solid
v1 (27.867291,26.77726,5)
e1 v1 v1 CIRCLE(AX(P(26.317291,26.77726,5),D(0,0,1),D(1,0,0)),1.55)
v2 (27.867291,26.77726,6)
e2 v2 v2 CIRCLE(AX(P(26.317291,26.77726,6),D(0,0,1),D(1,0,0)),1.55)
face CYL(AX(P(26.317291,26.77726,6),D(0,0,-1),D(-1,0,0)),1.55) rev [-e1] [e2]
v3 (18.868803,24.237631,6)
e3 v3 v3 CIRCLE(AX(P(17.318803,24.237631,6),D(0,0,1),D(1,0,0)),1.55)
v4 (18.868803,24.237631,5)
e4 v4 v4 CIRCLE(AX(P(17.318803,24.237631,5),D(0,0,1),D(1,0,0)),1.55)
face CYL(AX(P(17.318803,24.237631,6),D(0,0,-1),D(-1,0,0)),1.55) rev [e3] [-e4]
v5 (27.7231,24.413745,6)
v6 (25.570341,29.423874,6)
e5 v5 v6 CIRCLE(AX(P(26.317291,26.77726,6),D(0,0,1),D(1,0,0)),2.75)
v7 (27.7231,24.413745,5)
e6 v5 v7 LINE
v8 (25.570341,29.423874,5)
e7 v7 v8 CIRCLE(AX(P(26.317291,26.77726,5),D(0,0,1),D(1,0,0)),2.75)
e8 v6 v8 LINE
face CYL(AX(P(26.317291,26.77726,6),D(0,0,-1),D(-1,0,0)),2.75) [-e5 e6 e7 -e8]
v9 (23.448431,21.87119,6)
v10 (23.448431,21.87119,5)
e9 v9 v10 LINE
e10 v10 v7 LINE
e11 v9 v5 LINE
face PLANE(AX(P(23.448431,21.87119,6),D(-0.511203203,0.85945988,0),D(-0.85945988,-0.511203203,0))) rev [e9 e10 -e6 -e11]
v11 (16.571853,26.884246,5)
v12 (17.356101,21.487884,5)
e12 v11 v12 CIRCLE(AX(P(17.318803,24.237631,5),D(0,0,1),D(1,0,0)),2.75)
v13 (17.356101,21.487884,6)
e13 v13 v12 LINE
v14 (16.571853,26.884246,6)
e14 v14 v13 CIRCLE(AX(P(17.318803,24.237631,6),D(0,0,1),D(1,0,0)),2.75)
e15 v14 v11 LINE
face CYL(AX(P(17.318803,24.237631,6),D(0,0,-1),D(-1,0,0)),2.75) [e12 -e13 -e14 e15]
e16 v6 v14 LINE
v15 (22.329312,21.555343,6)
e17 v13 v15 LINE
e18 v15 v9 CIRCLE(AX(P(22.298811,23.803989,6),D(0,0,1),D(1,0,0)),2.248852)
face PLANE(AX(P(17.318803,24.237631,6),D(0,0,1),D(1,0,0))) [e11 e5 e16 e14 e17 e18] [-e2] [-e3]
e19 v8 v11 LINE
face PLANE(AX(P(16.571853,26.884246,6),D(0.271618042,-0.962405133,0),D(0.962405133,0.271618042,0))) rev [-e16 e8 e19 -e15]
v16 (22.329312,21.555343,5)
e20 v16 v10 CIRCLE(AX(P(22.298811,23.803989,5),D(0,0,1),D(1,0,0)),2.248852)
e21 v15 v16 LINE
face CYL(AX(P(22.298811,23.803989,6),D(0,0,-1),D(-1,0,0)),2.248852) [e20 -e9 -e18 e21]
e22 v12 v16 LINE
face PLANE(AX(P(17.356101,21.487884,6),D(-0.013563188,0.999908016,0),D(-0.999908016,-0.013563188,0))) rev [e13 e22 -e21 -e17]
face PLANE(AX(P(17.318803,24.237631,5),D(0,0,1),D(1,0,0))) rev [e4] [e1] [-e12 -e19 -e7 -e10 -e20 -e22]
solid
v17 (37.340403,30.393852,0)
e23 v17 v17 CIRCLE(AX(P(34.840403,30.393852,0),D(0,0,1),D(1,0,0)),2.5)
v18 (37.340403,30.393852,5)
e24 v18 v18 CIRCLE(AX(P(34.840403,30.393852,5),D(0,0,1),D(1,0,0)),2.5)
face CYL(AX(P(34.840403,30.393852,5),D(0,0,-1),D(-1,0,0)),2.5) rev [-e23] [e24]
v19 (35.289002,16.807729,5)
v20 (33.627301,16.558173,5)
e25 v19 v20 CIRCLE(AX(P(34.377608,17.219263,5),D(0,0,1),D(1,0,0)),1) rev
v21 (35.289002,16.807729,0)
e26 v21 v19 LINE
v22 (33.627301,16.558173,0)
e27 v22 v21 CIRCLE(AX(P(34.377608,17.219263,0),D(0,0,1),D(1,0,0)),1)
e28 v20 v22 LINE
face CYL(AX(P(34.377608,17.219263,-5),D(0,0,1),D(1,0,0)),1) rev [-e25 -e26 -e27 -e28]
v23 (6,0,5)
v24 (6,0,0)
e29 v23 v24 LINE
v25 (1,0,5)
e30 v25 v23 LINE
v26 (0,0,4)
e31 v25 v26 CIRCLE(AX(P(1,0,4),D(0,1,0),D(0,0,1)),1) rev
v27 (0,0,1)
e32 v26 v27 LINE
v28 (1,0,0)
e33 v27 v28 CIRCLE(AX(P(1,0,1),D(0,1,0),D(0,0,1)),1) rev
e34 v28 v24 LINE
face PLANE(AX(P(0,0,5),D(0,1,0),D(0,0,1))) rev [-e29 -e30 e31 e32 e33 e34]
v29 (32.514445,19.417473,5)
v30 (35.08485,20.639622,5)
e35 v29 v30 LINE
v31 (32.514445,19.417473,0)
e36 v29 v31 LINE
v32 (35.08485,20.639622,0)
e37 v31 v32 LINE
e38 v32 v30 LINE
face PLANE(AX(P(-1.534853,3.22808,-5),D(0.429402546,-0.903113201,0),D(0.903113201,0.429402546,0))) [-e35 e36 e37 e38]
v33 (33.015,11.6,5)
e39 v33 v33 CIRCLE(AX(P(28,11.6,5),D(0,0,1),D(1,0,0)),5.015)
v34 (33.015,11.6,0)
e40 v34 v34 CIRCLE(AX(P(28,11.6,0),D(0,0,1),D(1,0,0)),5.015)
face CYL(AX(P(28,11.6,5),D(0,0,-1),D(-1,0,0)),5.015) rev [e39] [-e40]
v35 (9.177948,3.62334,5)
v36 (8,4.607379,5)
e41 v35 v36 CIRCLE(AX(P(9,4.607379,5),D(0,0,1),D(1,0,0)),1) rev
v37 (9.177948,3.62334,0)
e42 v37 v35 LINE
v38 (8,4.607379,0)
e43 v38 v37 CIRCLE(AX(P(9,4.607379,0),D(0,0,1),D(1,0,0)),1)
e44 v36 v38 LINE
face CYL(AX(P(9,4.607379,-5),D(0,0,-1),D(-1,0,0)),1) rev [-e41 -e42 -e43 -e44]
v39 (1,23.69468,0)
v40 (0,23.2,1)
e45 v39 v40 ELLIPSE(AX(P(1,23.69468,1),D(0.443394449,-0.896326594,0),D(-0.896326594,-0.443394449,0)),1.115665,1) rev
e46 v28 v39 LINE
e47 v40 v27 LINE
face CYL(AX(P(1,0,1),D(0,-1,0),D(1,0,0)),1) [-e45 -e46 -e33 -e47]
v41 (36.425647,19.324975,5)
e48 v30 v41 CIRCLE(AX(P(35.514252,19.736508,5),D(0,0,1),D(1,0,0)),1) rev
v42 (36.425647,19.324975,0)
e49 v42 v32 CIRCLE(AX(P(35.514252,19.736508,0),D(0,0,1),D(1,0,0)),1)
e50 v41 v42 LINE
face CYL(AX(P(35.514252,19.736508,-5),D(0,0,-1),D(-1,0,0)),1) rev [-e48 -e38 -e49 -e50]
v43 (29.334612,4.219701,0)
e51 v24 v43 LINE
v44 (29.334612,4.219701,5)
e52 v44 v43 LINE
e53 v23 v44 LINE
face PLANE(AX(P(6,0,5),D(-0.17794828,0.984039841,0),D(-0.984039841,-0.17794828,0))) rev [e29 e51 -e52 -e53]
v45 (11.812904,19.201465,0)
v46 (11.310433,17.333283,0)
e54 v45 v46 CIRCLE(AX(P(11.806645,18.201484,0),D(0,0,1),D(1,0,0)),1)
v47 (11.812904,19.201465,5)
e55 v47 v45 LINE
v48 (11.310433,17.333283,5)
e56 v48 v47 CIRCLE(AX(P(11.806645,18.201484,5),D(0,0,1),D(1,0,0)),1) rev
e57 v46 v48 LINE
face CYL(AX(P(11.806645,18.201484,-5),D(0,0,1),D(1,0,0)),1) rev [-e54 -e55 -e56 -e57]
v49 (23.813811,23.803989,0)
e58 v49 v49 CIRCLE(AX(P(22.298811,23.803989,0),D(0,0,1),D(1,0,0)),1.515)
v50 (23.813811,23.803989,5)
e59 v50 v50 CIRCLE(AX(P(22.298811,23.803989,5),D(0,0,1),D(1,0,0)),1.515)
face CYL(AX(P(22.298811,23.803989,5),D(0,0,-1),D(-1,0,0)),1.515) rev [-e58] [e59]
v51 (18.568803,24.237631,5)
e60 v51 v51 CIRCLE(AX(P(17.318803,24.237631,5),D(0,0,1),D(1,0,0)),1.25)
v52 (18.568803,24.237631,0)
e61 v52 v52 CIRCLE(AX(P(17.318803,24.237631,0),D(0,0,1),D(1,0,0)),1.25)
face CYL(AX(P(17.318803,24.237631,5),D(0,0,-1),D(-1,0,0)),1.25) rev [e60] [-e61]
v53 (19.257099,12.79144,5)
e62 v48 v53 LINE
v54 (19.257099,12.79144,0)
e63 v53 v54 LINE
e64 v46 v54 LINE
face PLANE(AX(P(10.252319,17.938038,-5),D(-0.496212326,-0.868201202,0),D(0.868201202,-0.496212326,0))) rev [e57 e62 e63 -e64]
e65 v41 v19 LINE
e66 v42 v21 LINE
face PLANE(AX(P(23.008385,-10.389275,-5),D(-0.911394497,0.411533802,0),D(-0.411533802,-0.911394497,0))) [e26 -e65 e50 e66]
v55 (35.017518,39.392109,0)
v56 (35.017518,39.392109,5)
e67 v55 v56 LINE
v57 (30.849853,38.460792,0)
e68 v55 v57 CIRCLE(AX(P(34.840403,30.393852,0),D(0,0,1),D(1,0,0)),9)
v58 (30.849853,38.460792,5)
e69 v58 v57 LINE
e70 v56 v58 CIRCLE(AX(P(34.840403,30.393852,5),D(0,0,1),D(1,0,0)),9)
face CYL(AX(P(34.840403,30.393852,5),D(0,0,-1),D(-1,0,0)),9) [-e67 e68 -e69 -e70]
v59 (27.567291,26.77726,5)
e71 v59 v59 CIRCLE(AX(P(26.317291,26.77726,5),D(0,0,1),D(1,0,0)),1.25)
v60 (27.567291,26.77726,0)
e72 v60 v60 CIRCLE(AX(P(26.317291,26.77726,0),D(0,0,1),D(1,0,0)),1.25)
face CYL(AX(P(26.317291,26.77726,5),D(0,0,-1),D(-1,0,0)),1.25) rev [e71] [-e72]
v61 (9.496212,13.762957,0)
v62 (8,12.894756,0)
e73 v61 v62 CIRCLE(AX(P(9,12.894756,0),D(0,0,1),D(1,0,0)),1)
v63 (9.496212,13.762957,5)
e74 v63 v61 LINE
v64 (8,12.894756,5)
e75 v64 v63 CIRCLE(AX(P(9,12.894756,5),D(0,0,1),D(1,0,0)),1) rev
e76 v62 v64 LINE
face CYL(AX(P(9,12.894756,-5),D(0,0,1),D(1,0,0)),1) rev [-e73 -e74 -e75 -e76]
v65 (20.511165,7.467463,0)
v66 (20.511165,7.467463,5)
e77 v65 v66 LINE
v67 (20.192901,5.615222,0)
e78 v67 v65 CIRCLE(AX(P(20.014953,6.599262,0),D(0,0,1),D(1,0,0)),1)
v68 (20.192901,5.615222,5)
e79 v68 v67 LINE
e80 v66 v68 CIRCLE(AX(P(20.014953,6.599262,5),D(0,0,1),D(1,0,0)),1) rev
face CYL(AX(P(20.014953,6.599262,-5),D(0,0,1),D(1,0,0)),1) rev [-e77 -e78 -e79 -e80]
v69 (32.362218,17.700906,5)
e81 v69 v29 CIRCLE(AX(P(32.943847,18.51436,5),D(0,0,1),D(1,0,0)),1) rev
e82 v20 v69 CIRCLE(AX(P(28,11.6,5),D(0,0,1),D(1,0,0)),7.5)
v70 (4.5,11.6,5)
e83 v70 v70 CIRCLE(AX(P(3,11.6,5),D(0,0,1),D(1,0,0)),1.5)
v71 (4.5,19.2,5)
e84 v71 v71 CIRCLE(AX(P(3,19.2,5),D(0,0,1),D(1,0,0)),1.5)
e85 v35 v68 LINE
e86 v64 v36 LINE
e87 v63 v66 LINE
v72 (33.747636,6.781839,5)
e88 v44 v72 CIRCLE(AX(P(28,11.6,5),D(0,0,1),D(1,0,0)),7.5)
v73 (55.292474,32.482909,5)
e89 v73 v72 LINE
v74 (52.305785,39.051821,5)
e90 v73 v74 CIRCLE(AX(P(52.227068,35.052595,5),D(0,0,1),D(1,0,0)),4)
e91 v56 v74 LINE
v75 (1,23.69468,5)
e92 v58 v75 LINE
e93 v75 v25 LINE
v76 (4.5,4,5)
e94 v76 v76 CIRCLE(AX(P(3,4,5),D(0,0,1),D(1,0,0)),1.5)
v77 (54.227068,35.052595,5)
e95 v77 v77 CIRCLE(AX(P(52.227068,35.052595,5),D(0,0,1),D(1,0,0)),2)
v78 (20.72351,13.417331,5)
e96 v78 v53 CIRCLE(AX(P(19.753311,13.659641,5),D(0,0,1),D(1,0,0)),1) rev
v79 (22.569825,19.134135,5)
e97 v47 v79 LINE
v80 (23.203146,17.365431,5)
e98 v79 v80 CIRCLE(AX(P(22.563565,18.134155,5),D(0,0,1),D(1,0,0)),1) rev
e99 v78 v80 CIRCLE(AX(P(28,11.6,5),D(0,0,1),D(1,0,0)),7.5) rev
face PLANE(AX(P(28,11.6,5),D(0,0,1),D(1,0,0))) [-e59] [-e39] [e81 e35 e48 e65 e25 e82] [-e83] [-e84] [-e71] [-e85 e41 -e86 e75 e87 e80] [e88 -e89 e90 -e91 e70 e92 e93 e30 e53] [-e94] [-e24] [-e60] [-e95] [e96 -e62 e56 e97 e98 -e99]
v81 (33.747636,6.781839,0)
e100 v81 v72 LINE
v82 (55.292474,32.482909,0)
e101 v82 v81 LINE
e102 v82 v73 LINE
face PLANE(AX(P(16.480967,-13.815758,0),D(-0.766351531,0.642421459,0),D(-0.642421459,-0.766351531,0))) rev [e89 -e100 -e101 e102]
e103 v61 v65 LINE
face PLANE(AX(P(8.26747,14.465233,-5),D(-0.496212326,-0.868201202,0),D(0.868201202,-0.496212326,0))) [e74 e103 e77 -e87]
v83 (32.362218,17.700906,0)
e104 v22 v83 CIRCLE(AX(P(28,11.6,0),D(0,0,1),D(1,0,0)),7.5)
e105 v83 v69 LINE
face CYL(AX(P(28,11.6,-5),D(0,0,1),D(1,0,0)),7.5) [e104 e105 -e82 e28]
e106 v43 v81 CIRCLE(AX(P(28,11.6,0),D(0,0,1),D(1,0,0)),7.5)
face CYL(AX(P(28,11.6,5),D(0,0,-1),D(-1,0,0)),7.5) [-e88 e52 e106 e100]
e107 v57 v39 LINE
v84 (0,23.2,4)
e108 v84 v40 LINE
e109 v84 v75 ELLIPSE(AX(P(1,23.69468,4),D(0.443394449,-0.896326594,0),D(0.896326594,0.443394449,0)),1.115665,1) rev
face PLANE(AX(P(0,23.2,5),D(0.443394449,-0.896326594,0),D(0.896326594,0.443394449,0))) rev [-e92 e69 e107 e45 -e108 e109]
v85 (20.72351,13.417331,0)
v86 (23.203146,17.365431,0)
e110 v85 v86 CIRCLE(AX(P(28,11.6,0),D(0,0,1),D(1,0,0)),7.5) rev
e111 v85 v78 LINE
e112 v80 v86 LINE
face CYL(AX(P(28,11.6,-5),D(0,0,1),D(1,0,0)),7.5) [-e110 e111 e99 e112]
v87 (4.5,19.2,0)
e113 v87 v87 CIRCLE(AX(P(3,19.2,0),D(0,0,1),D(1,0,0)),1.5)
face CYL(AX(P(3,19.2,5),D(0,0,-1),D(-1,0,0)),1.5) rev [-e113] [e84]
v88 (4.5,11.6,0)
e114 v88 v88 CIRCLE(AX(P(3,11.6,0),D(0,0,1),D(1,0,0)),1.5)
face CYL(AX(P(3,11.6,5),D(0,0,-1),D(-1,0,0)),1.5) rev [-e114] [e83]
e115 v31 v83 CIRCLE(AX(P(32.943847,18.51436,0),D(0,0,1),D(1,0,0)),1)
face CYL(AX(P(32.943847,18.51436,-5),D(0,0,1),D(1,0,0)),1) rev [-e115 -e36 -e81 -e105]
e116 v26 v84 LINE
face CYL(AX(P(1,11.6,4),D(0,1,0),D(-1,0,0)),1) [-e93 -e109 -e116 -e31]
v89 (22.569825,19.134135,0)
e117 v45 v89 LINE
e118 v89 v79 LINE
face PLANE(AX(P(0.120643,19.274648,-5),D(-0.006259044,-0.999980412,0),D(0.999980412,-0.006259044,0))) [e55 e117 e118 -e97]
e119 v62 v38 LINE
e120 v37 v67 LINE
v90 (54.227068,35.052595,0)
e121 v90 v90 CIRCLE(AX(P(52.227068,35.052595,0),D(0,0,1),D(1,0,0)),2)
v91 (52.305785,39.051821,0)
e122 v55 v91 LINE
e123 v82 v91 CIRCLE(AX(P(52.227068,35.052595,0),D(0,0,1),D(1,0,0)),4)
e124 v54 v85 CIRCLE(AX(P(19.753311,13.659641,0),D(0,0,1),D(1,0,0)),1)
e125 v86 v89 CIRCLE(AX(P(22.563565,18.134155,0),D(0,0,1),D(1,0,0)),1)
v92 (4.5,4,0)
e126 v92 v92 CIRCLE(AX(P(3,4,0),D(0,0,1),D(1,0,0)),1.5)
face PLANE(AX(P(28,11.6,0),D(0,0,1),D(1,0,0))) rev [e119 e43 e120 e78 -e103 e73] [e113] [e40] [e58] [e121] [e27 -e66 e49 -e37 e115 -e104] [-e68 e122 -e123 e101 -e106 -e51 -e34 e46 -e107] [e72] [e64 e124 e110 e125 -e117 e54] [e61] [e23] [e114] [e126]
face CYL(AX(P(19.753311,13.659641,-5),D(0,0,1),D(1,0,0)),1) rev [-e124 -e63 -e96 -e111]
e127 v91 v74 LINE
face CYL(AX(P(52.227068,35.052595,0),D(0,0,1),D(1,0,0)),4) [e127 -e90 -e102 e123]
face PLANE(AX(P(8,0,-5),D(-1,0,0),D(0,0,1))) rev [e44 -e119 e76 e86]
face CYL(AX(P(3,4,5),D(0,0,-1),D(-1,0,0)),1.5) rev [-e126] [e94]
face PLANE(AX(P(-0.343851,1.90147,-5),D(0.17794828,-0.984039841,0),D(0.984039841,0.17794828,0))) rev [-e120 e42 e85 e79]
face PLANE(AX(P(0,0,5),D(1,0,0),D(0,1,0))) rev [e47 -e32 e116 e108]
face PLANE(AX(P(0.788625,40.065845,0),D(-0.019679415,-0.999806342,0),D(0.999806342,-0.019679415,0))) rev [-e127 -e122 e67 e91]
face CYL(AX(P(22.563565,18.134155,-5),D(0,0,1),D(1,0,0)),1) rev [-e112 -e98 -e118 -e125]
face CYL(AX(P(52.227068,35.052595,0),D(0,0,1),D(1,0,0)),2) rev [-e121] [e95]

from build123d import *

# Parameters (mm, degrees)
SKETCH_1_R          = 1.5
SKETCH_1_R_2        = 5.015
SKETCH_1_R_3        = 2.5
SKETCH_1_R_4        = 1.515
SKETCH_1_R_5        = 1.25
EXTRUDE_1_DEPTH     = 5
FILLET_1_R          = 1
SKETCH_2_R          = 1.55
EXTRUDE_2_DEPTH     = 1
CUT_EXTRUDE_START   = -10
CUT_EXTRUDE_1_DEPTH = 10
FILLET_2_R          = 1
EXTRUDE_START       = -5
SKETCH_4_R          = 2
EXTRUDE_3_DEPTH     = 5


with BuildPart() as part:
    # 草图1 → 凸台-拉伸1 (new body)
    with BuildSketch(Plane.XY):
        with BuildLine():
            Line((0, 0), (0, 23.2))
            Line((0, 23.2), (30.849852826, 38.460791759))
            ThreePointArc((30.849852826, 38.460791759), (41.091229844, 36.86897111), (43.042953344, 26.6900482))
            Line((43.042953344, 26.6900482), (34.835458731, 8.513496487))
            ThreePointArc((34.835458731, 8.513496487), (32.614833027, 5.68786704), (29.3346121, 4.219701189))
            Line((29.3346121, 4.219701189), (6, 0))
            Line((6, 0), (0, 0))
        make_face()
        with Locations((3, 19.2)):
            Circle(SKETCH_1_R, mode=Mode.SUBTRACT)
        with Locations((3, 11.6)):
            Circle(SKETCH_1_R, mode=Mode.SUBTRACT)
        with Locations((3, 4)):
            Circle(SKETCH_1_R, mode=Mode.SUBTRACT)
        with Locations((28, 11.6)):
            Circle(SKETCH_1_R_2, mode=Mode.SUBTRACT)
        with Locations((34.840402867, 30.393852416)):
            Circle(SKETCH_1_R_3, mode=Mode.SUBTRACT)
        with Locations((22.298810634, 23.803988685)):
            Circle(SKETCH_1_R_4, mode=Mode.SUBTRACT)
        with Locations((17.318802705, 24.237631422)):
            Circle(SKETCH_1_R_5, mode=Mode.SUBTRACT)
        with Locations((26.317290694, 26.777260117)):
            Circle(SKETCH_1_R_5, mode=Mode.SUBTRACT)
    extrude(amount=EXTRUDE_1_DEPTH)

    # 圆角1
    fillet_1_edges = [part.edges().sort_by_distance(p)[0] for p in [
        (0, 11.6, 0),
        (0, 11.6, 5),
    ]]
    fillet(fillet_1_edges, radius=FILLET_1_R)

    # 草图3 → 切除-拉伸1 (cut)
    with BuildSketch(Plane.XY.offset(5).offset(CUT_EXTRUDE_START)):
        with BuildLine():
            Line((34.570478049, 15.216464877), (37.548117185, 21.810829453))
            Line((37.548117185, 21.810829453), (30.748975297, 18.578046633))
            ThreePointArc((30.748975297, 18.578046633), (32.953595729, 17.231331047), (34.570478049, 15.216464877))
        make_face()
        Polygon((8, 14.618103259), (8, 3.410325902), (22.896528211, 6.104131033), align=None)
        with BuildLine():
            Line((28.046942827, 19.09985309), (8, 19.225330237))
            Line((8, 19.225330237), (20.514901979, 12.072554345))
            ThreePointArc((20.514901979, 12.072554345), (22.883627253, 17.083860858), (28.046942827, 19.09985309))
        make_face()
    extrude(amount=CUT_EXTRUDE_1_DEPTH, mode=Mode.SUBTRACT)

    # 圆角2
    fillet_2_edges = [part.edges().sort_by_distance(p)[0] for p in [
        (22.896528211, 6.104131033, 2.5),
        (8, 3.410325902, 2.5),
        (30.748975297, 18.578046633, 2.5),
        (37.548117185, 21.810829453, 2.5),
        (34.570478049, 15.216464877, 2.5),
        (8, 14.618103259, 2.5),
        (20.514901979, 12.072554345, 2.5),
        (8, 19.225330237, 2.5),
    ]]
    fillet(fillet_2_edges, radius=FILLET_2_R)
    fillet_2_2_edges = [part.edges().sort_by_distance(p)[0] for p in [
        (28.046942827, 19.09985309, 2.5),
    ]]
    fillet(fillet_2_2_edges, radius=FILLET_2_R)

    # 草图4 → 凸台-拉伸3 (add)
    with BuildSketch(Plane.XY.offset(5).offset(EXTRUDE_START)):
        with BuildLine():
            Line((52.3057854, 39.051820594), (35.017517601, 39.39210949))
            ThreePointArc((35.017517601, 39.39210949), (42.448969585, 35.201108648), (43.042953344, 26.6900482))
            Line((43.042953344, 26.6900482), (34.835458731, 8.513496487))
            ThreePointArc((34.835458731, 8.513496487), (34.350844876, 7.610417396), (33.747636481, 6.781839056))
            Line((33.747636481, 6.781839056), (55.292473863, 32.482909391))
            ThreePointArc((55.292473863, 32.482909391), (55.868362453, 36.708183585), (52.3057854, 39.051820594))
        make_face()
        with Locations((52.22706774, 35.052595228)):
            Circle(SKETCH_4_R, mode=Mode.SUBTRACT)
    extrude(amount=EXTRUDE_3_DEPTH)


with BuildPart() as body_2:
    # 草图2 → 凸台-拉伸2 (new body)
    with BuildSketch(Plane.XY.offset(5)):
        with BuildLine():
            Line((16.571853089, 26.884245537), (25.570341078, 29.423874231))
            ThreePointArc((25.570341078, 29.423874231), (28.843923131, 27.862906713), (27.723099502, 24.413745446))
            Line((27.723099502, 24.413745446), (23.448431167, 21.871190298))
            ThreePointArc((23.448431167, 21.871190298), (22.909639512, 21.639681623), (22.329312241, 21.555343175))
            Line((22.329312241, 21.555343175), (17.356101471, 21.487884379))
            ThreePointArc((17.356101471, 21.487884379), (14.597391395, 23.842131129), (16.571853089, 26.884245537))
        make_face()
        with Locations((17.318802705, 24.237631422)):
            Circle(SKETCH_2_R, mode=Mode.SUBTRACT)
        with Locations((26.317290694, 26.777260117)):
            Circle(SKETCH_2_R, mode=Mode.SUBTRACT)
    extrude(amount=EXTRUDE_2_DEPTH)


solid = Compound([part.part, body_2.part])
